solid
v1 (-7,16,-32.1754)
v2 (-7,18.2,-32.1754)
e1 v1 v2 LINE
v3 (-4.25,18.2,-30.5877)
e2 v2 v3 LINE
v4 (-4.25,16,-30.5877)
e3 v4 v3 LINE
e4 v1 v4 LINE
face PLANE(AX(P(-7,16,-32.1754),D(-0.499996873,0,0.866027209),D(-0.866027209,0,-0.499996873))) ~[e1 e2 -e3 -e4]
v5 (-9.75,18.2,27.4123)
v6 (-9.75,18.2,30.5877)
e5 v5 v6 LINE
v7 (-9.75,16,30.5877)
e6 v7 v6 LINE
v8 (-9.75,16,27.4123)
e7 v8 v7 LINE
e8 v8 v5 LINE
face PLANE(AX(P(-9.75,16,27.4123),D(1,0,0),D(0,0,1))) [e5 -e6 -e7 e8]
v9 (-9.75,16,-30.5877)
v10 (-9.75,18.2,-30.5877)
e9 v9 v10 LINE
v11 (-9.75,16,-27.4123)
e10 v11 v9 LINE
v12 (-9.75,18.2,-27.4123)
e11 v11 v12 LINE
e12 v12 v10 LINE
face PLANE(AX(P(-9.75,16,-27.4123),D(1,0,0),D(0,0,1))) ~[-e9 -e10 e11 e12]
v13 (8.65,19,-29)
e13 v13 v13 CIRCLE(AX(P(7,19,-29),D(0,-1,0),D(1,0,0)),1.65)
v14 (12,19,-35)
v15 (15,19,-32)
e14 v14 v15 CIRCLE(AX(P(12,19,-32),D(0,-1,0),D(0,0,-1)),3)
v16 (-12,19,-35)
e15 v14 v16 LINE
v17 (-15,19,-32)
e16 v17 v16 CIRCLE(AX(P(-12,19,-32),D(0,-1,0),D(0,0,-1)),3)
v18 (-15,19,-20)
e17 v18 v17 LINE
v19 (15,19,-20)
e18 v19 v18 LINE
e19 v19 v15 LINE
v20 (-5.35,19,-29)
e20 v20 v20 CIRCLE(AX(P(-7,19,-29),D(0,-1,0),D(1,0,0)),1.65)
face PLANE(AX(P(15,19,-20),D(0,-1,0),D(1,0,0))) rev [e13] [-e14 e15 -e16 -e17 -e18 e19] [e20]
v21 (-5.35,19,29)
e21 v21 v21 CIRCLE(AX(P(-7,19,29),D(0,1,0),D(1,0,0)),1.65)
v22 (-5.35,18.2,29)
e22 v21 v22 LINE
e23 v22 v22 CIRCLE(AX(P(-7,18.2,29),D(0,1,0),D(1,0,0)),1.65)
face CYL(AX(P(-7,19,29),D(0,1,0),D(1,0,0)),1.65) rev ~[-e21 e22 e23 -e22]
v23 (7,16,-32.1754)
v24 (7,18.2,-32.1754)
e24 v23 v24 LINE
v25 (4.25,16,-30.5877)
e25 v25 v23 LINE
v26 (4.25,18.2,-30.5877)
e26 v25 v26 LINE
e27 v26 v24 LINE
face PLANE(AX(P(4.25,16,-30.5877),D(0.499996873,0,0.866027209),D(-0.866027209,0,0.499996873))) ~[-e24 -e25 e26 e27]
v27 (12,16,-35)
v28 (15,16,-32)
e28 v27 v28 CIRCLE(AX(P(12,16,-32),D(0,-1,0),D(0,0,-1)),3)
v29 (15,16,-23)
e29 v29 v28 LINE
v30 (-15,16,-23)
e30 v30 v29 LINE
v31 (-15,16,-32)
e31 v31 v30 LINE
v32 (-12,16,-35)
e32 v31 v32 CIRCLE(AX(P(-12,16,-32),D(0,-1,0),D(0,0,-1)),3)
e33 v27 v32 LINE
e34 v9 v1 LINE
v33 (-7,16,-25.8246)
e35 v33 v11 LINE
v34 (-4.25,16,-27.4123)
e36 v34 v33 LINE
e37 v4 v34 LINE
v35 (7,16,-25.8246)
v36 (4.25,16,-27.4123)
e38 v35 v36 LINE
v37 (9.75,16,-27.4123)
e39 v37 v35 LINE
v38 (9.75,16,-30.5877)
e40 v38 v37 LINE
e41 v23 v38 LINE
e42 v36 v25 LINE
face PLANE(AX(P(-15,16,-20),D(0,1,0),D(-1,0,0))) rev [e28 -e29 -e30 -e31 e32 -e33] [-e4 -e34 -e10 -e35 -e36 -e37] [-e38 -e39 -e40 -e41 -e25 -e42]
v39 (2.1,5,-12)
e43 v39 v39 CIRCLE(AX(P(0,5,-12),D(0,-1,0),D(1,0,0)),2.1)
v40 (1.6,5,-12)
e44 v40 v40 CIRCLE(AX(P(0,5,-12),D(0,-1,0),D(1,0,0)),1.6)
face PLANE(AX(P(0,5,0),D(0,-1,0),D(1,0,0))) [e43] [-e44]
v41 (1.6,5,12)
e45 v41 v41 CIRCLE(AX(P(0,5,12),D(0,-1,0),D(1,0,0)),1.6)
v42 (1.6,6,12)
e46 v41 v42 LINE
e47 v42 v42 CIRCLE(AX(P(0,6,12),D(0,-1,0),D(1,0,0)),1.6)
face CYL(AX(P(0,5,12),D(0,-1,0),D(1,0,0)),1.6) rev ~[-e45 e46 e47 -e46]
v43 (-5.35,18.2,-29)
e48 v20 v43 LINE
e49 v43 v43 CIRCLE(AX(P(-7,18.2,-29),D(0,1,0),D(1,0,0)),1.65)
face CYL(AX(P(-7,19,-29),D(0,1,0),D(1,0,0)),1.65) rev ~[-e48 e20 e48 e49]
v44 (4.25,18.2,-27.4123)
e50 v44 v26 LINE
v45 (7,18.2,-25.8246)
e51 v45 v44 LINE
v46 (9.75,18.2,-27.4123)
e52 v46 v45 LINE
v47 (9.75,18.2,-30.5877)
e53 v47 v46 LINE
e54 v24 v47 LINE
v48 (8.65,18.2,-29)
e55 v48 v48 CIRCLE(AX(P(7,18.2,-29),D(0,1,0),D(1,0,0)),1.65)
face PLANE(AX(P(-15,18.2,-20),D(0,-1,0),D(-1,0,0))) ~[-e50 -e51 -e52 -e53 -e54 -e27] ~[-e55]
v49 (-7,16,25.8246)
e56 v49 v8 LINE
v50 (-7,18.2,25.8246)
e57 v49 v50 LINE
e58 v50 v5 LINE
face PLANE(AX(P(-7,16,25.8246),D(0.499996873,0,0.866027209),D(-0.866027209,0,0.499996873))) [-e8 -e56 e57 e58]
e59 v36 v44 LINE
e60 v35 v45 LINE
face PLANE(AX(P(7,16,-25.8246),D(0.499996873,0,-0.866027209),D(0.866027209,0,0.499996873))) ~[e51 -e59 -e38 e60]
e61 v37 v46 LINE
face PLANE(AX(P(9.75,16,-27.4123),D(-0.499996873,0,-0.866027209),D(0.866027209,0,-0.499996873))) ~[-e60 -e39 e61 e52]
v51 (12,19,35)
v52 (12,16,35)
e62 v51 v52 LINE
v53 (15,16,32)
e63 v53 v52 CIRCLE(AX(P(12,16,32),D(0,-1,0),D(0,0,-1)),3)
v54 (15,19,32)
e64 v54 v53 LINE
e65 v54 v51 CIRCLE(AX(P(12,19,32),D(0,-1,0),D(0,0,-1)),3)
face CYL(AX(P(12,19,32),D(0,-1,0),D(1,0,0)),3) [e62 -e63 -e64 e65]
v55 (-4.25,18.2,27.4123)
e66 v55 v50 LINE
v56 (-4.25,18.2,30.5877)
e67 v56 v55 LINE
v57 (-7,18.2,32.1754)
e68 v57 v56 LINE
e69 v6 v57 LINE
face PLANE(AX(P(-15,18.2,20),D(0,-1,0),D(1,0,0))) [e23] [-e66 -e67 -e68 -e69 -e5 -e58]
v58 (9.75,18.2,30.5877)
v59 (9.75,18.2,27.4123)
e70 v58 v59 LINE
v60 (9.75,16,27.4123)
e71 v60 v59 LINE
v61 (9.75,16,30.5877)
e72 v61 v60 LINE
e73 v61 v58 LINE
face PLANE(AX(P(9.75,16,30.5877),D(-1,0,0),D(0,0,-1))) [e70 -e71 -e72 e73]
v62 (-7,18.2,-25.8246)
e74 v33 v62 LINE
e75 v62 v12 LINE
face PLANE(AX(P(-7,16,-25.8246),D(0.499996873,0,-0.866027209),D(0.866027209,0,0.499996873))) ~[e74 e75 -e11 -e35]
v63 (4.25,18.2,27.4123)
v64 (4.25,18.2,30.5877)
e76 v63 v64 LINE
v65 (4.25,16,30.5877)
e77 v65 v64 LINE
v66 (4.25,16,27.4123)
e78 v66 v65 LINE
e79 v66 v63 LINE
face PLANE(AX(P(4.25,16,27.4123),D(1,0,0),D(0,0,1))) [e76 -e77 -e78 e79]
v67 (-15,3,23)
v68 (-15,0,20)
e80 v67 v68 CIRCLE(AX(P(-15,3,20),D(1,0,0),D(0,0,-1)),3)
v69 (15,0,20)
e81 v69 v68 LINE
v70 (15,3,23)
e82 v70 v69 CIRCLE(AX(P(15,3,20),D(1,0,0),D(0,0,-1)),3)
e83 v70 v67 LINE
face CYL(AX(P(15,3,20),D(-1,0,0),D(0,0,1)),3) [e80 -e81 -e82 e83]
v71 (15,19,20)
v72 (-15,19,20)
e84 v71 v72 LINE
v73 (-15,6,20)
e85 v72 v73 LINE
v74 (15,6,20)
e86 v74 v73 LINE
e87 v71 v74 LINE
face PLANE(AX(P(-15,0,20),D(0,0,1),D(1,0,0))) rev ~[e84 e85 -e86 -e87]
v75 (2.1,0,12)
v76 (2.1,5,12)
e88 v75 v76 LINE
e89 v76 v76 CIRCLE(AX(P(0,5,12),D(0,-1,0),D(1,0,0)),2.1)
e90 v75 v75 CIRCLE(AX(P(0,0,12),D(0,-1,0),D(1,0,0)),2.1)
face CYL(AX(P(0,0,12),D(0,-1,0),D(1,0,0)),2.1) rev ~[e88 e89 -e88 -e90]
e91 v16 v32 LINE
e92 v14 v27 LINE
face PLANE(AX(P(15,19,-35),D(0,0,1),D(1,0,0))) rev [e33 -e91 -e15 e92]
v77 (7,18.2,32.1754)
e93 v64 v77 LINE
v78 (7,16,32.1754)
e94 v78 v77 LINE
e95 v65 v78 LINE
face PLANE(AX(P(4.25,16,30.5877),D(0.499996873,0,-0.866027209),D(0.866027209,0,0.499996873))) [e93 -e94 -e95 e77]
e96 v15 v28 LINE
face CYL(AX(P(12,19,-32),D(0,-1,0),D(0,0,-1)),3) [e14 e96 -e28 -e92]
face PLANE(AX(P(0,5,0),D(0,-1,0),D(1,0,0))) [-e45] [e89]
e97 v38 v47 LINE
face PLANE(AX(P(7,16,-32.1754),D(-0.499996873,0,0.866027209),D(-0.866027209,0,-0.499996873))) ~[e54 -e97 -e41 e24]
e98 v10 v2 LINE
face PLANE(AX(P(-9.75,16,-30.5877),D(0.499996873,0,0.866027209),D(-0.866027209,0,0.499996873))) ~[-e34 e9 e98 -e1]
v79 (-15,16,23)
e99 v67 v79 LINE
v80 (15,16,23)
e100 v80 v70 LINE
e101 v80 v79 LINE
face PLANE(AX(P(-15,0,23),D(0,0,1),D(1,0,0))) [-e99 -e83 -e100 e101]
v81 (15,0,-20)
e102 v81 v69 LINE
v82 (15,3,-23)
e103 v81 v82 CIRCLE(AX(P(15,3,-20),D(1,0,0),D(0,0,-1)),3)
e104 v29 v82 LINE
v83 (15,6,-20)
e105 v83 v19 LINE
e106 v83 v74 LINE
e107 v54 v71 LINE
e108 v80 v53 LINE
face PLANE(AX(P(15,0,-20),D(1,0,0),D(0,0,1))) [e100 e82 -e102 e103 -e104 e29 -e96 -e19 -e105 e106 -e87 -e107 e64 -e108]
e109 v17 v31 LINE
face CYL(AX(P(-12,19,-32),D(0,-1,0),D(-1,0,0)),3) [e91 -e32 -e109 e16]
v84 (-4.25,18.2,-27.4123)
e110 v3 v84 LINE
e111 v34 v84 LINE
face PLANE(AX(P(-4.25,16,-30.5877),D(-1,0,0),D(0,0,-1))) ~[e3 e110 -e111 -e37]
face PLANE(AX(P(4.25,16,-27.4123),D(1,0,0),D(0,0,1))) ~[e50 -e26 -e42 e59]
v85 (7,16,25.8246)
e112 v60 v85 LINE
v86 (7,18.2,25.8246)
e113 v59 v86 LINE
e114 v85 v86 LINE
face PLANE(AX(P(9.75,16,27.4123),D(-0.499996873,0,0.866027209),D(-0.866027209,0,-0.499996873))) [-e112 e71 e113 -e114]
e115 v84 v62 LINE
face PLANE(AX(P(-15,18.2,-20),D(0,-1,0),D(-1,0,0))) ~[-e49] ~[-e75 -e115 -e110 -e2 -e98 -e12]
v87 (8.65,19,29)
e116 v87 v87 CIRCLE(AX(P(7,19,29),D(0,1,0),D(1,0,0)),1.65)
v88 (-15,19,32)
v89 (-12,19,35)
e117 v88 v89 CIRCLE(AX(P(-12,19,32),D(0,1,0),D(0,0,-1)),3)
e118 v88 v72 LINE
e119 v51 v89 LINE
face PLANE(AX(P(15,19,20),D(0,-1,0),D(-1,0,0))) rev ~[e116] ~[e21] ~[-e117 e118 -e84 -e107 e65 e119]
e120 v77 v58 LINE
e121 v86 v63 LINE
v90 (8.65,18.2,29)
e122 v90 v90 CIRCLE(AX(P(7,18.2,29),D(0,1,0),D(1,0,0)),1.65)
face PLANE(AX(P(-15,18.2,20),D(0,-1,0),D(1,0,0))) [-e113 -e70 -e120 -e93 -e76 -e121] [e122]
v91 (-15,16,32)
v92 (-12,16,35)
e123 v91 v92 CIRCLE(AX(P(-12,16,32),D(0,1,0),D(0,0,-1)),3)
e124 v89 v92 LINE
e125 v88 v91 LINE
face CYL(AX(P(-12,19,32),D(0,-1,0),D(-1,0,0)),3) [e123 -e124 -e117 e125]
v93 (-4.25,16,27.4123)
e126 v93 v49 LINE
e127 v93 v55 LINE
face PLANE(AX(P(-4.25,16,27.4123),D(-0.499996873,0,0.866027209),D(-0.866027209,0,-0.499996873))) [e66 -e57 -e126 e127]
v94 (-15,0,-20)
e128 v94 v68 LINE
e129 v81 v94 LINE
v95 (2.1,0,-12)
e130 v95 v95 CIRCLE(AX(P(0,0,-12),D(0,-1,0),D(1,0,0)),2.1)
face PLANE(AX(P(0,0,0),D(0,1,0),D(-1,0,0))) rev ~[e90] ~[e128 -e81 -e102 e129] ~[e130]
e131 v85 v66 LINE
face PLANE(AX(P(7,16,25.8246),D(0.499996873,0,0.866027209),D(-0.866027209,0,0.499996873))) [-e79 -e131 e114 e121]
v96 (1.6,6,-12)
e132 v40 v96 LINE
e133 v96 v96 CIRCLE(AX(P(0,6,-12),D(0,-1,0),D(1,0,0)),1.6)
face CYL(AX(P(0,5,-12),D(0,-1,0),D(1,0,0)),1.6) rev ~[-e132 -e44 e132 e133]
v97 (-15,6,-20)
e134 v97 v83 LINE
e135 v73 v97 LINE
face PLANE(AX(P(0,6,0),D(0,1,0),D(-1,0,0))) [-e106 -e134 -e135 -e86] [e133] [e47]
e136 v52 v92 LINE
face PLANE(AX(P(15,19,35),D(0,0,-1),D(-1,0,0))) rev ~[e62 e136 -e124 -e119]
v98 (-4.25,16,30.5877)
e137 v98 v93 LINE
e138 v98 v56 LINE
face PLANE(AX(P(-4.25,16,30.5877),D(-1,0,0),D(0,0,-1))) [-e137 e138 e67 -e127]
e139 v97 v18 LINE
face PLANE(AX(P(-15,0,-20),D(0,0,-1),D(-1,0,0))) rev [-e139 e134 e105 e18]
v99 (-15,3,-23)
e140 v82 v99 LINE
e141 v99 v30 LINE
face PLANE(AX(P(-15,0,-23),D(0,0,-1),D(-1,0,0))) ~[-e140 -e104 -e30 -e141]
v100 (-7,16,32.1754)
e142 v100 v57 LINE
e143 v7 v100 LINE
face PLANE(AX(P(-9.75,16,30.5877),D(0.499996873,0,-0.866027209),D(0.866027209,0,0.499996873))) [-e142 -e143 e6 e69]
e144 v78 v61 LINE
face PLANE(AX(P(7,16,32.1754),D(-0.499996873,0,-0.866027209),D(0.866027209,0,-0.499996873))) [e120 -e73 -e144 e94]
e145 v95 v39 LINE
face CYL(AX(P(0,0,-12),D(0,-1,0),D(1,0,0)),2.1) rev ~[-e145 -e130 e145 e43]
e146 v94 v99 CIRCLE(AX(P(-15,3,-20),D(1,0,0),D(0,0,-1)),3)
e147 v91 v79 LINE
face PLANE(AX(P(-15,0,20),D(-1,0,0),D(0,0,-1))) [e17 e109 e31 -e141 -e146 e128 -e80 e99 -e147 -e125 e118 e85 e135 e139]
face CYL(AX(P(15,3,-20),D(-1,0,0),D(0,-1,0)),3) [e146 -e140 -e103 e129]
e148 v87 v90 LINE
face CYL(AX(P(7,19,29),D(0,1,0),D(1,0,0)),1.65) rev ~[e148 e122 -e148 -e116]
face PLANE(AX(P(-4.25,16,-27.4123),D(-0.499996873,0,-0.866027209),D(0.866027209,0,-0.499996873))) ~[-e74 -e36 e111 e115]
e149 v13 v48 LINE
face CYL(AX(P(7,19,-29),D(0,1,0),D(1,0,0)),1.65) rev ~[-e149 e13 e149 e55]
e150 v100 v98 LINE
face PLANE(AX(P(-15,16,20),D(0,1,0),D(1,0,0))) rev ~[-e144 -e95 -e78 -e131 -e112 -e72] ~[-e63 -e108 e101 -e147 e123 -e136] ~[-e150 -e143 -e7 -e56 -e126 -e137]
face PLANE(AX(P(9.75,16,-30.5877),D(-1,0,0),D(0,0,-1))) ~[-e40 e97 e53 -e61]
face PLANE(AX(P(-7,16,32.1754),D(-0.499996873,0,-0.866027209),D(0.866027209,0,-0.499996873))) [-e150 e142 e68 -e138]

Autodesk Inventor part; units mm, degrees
ref_plane "YZ Plane" through (0, 0, 0) normal (1, 0, 0) x (0, 1, 0)
ref_plane "XZ Plane" through (0, 0, 0) normal (0, 1, 0) x (-1, 0, 0)
ref_plane "XY Plane" through (0, 0, 0) normal (0, 0, 1) x (1, 0, 0)
sketch "Эскиз1" plane through (0, 0, 0) normal (0, 1, 0) x (-1, 0, 0)
  line L0 (-15, 20) -> (15, 20)
  line L1 (15, 20) -> (15, -20)
  line L2 (15, -20) -> (-15, -20)
  line L3 (-15, -20) -> (-15, 20)
  line L4 (-15, 20) -> (15, -20) construction
  line L5 (15, 20) -> (-15, -20) construction
  point P0 (0, 0)
  dimension "d0" = 40
  dimension "d1" = 30
extrude "Выдавливание1" add sketch "Эскиз1" along normal blind 6
sketch "Эскиз2" plane through (-15, 0, 20) normal (0, 0, 1) x (1, 0, 0)
  line L0 (30, 0) -> (0, 0) projected
  line L1 (0, 0) -> (30, 0)
  line L2 (30, 0) -> (30, 19)
  line L3 (30, 19) -> (0, 19)
  line L4 (0, 19) -> (0, 0)
  line L5 (0, 6) -> (30, 6) projected
  point P0 (15, 0)
  dimension "d4" = 13
extrude "Выдавливание2" add sketch "Эскиз2" along normal blind 3
sketch "Эскиз4" plane through (-15, 19, 20) normal (0, 1, 0) x (1, 0, 0)
  line L0 (0, 40) -> (0, 0) projected
  line L1 (0, 0) -> (30, 0)
  line L2 (30, 0) -> (30, -15)
  line L3 (30, -15) -> (0, -15)
  line L4 (0, -15) -> (0, 0)
  point P0 (15, 20)
  point P1 (30, 0)
  dimension "d7" = 15
extrude "Выдавливание3" add sketch "Эскиз4" against normal blind 3
fillet "Сопряжение1" radius 3 3 edges at (15, 17.5, 35) (-15, 17.5, 35) (0, 0, 23)
sketch "Эскиз5" plane through (-15, 19, 20) normal (0, 1, 0) x (1, 0, 0)
  circle A0 centre (8, -9) radius 1.65
  circle A1 centre (22, -9) radius 1.65
  line L0 (0, 0) -> (0, -12) projected
  line L1 (30, -3) -> (30, -12) projected
  line L2 (30, 0) -> (0, 0) projected
  point P0 (15, 20)
  dimension "d11" = 3.3
  dimension "d12" = 3.3
  dimension "d13" = 8
  dimension "d14" = 8
  dimension "d15" = 9
  dimension "d16" = 9
extrude "Выдавливание4" cut sketch "Эскиз5" against normal blind 3
sketch "Эскиз6" plane through (-15, 16, 20) normal (0, -1, 0) x (1, 0, 0)
  circle A0 centre (22, 9) radius 1.65 construction
  circle A1 centre (8, 9) radius 1.65 construction
  line L0 (24.75, 7.4123) -> (22, 5.8246)
  line L1 (22, 5.8246) -> (19.25, 7.4123)
  line L2 (19.25, 7.4123) -> (19.25, 10.5877)
  line L3 (19.25, 10.5877) -> (22, 12.1754)
  line L4 (22, 12.1754) -> (24.75, 10.5877)
  line L5 (24.75, 10.5877) -> (24.75, 7.4123)
  line L6 (10.75, 7.4123) -> (8, 5.8246)
  line L7 (8, 5.8246) -> (5.25, 7.4123)
  line L8 (5.25, 7.4123) -> (5.25, 10.5877)
  line L9 (5.25, 10.5877) -> (8, 12.1754)
  line L10 (8, 12.1754) -> (10.75, 10.5877)
  line L11 (10.75, 10.5877) -> (10.75, 7.4123)
  line L12 (0, 12) -> (0, 3) projected
  line L13 (30, 3) -> (30, 12) projected
  point P0 (15, -20)
  point P1 (19.25, 9)
  dimension "d19" = 5.5
  dimension "d20" = 5.5
extrude "Выдавливание5" cut sketch "Эскиз6" against normal blind 2.2
mirror "Зеркальное отражение1" about plane through (0, 0, 0) normal (0, 0, 1) of "Выдавливание2", "Сопряжение1", "Выдавливание5", "Выдавливание4", "Выдавливание3"
sketch "Эскиз7" plane through (0, 0, 0) normal (0, -1, 0) x (1, 0, 0)
  circle A0 centre (0, 12) radius 2.1
  circle A1 centre (0, -12) radius 2.1
  point P0 (0, 0)
  dimension "d23" = 4.2
  dimension "d24" = 4.2
  dimension "d25" = 12
  dimension "d26" = 12
extrude "Выдавливание6" cut sketch "Эскиз7" against normal blind 5
sketch "Эскиз8" plane through (0, 5, 12) normal (0, -1, 0) x (1, 0, 0)
  circle A0 centre (0, 0) radius 1.6
  circle A1 centre (0, -24) radius 2.1 projected
  circle A2 centre (0, -24) radius 1.6
  point P0 (0, -12)
  dimension "d29" = 3.2
  dimension "d30" = 3.2
extrude "Выдавливание7" cut sketch "Эскиз8" against normal blind 6 contours A0 | A2
properties part number "креп_камеры_ros"
